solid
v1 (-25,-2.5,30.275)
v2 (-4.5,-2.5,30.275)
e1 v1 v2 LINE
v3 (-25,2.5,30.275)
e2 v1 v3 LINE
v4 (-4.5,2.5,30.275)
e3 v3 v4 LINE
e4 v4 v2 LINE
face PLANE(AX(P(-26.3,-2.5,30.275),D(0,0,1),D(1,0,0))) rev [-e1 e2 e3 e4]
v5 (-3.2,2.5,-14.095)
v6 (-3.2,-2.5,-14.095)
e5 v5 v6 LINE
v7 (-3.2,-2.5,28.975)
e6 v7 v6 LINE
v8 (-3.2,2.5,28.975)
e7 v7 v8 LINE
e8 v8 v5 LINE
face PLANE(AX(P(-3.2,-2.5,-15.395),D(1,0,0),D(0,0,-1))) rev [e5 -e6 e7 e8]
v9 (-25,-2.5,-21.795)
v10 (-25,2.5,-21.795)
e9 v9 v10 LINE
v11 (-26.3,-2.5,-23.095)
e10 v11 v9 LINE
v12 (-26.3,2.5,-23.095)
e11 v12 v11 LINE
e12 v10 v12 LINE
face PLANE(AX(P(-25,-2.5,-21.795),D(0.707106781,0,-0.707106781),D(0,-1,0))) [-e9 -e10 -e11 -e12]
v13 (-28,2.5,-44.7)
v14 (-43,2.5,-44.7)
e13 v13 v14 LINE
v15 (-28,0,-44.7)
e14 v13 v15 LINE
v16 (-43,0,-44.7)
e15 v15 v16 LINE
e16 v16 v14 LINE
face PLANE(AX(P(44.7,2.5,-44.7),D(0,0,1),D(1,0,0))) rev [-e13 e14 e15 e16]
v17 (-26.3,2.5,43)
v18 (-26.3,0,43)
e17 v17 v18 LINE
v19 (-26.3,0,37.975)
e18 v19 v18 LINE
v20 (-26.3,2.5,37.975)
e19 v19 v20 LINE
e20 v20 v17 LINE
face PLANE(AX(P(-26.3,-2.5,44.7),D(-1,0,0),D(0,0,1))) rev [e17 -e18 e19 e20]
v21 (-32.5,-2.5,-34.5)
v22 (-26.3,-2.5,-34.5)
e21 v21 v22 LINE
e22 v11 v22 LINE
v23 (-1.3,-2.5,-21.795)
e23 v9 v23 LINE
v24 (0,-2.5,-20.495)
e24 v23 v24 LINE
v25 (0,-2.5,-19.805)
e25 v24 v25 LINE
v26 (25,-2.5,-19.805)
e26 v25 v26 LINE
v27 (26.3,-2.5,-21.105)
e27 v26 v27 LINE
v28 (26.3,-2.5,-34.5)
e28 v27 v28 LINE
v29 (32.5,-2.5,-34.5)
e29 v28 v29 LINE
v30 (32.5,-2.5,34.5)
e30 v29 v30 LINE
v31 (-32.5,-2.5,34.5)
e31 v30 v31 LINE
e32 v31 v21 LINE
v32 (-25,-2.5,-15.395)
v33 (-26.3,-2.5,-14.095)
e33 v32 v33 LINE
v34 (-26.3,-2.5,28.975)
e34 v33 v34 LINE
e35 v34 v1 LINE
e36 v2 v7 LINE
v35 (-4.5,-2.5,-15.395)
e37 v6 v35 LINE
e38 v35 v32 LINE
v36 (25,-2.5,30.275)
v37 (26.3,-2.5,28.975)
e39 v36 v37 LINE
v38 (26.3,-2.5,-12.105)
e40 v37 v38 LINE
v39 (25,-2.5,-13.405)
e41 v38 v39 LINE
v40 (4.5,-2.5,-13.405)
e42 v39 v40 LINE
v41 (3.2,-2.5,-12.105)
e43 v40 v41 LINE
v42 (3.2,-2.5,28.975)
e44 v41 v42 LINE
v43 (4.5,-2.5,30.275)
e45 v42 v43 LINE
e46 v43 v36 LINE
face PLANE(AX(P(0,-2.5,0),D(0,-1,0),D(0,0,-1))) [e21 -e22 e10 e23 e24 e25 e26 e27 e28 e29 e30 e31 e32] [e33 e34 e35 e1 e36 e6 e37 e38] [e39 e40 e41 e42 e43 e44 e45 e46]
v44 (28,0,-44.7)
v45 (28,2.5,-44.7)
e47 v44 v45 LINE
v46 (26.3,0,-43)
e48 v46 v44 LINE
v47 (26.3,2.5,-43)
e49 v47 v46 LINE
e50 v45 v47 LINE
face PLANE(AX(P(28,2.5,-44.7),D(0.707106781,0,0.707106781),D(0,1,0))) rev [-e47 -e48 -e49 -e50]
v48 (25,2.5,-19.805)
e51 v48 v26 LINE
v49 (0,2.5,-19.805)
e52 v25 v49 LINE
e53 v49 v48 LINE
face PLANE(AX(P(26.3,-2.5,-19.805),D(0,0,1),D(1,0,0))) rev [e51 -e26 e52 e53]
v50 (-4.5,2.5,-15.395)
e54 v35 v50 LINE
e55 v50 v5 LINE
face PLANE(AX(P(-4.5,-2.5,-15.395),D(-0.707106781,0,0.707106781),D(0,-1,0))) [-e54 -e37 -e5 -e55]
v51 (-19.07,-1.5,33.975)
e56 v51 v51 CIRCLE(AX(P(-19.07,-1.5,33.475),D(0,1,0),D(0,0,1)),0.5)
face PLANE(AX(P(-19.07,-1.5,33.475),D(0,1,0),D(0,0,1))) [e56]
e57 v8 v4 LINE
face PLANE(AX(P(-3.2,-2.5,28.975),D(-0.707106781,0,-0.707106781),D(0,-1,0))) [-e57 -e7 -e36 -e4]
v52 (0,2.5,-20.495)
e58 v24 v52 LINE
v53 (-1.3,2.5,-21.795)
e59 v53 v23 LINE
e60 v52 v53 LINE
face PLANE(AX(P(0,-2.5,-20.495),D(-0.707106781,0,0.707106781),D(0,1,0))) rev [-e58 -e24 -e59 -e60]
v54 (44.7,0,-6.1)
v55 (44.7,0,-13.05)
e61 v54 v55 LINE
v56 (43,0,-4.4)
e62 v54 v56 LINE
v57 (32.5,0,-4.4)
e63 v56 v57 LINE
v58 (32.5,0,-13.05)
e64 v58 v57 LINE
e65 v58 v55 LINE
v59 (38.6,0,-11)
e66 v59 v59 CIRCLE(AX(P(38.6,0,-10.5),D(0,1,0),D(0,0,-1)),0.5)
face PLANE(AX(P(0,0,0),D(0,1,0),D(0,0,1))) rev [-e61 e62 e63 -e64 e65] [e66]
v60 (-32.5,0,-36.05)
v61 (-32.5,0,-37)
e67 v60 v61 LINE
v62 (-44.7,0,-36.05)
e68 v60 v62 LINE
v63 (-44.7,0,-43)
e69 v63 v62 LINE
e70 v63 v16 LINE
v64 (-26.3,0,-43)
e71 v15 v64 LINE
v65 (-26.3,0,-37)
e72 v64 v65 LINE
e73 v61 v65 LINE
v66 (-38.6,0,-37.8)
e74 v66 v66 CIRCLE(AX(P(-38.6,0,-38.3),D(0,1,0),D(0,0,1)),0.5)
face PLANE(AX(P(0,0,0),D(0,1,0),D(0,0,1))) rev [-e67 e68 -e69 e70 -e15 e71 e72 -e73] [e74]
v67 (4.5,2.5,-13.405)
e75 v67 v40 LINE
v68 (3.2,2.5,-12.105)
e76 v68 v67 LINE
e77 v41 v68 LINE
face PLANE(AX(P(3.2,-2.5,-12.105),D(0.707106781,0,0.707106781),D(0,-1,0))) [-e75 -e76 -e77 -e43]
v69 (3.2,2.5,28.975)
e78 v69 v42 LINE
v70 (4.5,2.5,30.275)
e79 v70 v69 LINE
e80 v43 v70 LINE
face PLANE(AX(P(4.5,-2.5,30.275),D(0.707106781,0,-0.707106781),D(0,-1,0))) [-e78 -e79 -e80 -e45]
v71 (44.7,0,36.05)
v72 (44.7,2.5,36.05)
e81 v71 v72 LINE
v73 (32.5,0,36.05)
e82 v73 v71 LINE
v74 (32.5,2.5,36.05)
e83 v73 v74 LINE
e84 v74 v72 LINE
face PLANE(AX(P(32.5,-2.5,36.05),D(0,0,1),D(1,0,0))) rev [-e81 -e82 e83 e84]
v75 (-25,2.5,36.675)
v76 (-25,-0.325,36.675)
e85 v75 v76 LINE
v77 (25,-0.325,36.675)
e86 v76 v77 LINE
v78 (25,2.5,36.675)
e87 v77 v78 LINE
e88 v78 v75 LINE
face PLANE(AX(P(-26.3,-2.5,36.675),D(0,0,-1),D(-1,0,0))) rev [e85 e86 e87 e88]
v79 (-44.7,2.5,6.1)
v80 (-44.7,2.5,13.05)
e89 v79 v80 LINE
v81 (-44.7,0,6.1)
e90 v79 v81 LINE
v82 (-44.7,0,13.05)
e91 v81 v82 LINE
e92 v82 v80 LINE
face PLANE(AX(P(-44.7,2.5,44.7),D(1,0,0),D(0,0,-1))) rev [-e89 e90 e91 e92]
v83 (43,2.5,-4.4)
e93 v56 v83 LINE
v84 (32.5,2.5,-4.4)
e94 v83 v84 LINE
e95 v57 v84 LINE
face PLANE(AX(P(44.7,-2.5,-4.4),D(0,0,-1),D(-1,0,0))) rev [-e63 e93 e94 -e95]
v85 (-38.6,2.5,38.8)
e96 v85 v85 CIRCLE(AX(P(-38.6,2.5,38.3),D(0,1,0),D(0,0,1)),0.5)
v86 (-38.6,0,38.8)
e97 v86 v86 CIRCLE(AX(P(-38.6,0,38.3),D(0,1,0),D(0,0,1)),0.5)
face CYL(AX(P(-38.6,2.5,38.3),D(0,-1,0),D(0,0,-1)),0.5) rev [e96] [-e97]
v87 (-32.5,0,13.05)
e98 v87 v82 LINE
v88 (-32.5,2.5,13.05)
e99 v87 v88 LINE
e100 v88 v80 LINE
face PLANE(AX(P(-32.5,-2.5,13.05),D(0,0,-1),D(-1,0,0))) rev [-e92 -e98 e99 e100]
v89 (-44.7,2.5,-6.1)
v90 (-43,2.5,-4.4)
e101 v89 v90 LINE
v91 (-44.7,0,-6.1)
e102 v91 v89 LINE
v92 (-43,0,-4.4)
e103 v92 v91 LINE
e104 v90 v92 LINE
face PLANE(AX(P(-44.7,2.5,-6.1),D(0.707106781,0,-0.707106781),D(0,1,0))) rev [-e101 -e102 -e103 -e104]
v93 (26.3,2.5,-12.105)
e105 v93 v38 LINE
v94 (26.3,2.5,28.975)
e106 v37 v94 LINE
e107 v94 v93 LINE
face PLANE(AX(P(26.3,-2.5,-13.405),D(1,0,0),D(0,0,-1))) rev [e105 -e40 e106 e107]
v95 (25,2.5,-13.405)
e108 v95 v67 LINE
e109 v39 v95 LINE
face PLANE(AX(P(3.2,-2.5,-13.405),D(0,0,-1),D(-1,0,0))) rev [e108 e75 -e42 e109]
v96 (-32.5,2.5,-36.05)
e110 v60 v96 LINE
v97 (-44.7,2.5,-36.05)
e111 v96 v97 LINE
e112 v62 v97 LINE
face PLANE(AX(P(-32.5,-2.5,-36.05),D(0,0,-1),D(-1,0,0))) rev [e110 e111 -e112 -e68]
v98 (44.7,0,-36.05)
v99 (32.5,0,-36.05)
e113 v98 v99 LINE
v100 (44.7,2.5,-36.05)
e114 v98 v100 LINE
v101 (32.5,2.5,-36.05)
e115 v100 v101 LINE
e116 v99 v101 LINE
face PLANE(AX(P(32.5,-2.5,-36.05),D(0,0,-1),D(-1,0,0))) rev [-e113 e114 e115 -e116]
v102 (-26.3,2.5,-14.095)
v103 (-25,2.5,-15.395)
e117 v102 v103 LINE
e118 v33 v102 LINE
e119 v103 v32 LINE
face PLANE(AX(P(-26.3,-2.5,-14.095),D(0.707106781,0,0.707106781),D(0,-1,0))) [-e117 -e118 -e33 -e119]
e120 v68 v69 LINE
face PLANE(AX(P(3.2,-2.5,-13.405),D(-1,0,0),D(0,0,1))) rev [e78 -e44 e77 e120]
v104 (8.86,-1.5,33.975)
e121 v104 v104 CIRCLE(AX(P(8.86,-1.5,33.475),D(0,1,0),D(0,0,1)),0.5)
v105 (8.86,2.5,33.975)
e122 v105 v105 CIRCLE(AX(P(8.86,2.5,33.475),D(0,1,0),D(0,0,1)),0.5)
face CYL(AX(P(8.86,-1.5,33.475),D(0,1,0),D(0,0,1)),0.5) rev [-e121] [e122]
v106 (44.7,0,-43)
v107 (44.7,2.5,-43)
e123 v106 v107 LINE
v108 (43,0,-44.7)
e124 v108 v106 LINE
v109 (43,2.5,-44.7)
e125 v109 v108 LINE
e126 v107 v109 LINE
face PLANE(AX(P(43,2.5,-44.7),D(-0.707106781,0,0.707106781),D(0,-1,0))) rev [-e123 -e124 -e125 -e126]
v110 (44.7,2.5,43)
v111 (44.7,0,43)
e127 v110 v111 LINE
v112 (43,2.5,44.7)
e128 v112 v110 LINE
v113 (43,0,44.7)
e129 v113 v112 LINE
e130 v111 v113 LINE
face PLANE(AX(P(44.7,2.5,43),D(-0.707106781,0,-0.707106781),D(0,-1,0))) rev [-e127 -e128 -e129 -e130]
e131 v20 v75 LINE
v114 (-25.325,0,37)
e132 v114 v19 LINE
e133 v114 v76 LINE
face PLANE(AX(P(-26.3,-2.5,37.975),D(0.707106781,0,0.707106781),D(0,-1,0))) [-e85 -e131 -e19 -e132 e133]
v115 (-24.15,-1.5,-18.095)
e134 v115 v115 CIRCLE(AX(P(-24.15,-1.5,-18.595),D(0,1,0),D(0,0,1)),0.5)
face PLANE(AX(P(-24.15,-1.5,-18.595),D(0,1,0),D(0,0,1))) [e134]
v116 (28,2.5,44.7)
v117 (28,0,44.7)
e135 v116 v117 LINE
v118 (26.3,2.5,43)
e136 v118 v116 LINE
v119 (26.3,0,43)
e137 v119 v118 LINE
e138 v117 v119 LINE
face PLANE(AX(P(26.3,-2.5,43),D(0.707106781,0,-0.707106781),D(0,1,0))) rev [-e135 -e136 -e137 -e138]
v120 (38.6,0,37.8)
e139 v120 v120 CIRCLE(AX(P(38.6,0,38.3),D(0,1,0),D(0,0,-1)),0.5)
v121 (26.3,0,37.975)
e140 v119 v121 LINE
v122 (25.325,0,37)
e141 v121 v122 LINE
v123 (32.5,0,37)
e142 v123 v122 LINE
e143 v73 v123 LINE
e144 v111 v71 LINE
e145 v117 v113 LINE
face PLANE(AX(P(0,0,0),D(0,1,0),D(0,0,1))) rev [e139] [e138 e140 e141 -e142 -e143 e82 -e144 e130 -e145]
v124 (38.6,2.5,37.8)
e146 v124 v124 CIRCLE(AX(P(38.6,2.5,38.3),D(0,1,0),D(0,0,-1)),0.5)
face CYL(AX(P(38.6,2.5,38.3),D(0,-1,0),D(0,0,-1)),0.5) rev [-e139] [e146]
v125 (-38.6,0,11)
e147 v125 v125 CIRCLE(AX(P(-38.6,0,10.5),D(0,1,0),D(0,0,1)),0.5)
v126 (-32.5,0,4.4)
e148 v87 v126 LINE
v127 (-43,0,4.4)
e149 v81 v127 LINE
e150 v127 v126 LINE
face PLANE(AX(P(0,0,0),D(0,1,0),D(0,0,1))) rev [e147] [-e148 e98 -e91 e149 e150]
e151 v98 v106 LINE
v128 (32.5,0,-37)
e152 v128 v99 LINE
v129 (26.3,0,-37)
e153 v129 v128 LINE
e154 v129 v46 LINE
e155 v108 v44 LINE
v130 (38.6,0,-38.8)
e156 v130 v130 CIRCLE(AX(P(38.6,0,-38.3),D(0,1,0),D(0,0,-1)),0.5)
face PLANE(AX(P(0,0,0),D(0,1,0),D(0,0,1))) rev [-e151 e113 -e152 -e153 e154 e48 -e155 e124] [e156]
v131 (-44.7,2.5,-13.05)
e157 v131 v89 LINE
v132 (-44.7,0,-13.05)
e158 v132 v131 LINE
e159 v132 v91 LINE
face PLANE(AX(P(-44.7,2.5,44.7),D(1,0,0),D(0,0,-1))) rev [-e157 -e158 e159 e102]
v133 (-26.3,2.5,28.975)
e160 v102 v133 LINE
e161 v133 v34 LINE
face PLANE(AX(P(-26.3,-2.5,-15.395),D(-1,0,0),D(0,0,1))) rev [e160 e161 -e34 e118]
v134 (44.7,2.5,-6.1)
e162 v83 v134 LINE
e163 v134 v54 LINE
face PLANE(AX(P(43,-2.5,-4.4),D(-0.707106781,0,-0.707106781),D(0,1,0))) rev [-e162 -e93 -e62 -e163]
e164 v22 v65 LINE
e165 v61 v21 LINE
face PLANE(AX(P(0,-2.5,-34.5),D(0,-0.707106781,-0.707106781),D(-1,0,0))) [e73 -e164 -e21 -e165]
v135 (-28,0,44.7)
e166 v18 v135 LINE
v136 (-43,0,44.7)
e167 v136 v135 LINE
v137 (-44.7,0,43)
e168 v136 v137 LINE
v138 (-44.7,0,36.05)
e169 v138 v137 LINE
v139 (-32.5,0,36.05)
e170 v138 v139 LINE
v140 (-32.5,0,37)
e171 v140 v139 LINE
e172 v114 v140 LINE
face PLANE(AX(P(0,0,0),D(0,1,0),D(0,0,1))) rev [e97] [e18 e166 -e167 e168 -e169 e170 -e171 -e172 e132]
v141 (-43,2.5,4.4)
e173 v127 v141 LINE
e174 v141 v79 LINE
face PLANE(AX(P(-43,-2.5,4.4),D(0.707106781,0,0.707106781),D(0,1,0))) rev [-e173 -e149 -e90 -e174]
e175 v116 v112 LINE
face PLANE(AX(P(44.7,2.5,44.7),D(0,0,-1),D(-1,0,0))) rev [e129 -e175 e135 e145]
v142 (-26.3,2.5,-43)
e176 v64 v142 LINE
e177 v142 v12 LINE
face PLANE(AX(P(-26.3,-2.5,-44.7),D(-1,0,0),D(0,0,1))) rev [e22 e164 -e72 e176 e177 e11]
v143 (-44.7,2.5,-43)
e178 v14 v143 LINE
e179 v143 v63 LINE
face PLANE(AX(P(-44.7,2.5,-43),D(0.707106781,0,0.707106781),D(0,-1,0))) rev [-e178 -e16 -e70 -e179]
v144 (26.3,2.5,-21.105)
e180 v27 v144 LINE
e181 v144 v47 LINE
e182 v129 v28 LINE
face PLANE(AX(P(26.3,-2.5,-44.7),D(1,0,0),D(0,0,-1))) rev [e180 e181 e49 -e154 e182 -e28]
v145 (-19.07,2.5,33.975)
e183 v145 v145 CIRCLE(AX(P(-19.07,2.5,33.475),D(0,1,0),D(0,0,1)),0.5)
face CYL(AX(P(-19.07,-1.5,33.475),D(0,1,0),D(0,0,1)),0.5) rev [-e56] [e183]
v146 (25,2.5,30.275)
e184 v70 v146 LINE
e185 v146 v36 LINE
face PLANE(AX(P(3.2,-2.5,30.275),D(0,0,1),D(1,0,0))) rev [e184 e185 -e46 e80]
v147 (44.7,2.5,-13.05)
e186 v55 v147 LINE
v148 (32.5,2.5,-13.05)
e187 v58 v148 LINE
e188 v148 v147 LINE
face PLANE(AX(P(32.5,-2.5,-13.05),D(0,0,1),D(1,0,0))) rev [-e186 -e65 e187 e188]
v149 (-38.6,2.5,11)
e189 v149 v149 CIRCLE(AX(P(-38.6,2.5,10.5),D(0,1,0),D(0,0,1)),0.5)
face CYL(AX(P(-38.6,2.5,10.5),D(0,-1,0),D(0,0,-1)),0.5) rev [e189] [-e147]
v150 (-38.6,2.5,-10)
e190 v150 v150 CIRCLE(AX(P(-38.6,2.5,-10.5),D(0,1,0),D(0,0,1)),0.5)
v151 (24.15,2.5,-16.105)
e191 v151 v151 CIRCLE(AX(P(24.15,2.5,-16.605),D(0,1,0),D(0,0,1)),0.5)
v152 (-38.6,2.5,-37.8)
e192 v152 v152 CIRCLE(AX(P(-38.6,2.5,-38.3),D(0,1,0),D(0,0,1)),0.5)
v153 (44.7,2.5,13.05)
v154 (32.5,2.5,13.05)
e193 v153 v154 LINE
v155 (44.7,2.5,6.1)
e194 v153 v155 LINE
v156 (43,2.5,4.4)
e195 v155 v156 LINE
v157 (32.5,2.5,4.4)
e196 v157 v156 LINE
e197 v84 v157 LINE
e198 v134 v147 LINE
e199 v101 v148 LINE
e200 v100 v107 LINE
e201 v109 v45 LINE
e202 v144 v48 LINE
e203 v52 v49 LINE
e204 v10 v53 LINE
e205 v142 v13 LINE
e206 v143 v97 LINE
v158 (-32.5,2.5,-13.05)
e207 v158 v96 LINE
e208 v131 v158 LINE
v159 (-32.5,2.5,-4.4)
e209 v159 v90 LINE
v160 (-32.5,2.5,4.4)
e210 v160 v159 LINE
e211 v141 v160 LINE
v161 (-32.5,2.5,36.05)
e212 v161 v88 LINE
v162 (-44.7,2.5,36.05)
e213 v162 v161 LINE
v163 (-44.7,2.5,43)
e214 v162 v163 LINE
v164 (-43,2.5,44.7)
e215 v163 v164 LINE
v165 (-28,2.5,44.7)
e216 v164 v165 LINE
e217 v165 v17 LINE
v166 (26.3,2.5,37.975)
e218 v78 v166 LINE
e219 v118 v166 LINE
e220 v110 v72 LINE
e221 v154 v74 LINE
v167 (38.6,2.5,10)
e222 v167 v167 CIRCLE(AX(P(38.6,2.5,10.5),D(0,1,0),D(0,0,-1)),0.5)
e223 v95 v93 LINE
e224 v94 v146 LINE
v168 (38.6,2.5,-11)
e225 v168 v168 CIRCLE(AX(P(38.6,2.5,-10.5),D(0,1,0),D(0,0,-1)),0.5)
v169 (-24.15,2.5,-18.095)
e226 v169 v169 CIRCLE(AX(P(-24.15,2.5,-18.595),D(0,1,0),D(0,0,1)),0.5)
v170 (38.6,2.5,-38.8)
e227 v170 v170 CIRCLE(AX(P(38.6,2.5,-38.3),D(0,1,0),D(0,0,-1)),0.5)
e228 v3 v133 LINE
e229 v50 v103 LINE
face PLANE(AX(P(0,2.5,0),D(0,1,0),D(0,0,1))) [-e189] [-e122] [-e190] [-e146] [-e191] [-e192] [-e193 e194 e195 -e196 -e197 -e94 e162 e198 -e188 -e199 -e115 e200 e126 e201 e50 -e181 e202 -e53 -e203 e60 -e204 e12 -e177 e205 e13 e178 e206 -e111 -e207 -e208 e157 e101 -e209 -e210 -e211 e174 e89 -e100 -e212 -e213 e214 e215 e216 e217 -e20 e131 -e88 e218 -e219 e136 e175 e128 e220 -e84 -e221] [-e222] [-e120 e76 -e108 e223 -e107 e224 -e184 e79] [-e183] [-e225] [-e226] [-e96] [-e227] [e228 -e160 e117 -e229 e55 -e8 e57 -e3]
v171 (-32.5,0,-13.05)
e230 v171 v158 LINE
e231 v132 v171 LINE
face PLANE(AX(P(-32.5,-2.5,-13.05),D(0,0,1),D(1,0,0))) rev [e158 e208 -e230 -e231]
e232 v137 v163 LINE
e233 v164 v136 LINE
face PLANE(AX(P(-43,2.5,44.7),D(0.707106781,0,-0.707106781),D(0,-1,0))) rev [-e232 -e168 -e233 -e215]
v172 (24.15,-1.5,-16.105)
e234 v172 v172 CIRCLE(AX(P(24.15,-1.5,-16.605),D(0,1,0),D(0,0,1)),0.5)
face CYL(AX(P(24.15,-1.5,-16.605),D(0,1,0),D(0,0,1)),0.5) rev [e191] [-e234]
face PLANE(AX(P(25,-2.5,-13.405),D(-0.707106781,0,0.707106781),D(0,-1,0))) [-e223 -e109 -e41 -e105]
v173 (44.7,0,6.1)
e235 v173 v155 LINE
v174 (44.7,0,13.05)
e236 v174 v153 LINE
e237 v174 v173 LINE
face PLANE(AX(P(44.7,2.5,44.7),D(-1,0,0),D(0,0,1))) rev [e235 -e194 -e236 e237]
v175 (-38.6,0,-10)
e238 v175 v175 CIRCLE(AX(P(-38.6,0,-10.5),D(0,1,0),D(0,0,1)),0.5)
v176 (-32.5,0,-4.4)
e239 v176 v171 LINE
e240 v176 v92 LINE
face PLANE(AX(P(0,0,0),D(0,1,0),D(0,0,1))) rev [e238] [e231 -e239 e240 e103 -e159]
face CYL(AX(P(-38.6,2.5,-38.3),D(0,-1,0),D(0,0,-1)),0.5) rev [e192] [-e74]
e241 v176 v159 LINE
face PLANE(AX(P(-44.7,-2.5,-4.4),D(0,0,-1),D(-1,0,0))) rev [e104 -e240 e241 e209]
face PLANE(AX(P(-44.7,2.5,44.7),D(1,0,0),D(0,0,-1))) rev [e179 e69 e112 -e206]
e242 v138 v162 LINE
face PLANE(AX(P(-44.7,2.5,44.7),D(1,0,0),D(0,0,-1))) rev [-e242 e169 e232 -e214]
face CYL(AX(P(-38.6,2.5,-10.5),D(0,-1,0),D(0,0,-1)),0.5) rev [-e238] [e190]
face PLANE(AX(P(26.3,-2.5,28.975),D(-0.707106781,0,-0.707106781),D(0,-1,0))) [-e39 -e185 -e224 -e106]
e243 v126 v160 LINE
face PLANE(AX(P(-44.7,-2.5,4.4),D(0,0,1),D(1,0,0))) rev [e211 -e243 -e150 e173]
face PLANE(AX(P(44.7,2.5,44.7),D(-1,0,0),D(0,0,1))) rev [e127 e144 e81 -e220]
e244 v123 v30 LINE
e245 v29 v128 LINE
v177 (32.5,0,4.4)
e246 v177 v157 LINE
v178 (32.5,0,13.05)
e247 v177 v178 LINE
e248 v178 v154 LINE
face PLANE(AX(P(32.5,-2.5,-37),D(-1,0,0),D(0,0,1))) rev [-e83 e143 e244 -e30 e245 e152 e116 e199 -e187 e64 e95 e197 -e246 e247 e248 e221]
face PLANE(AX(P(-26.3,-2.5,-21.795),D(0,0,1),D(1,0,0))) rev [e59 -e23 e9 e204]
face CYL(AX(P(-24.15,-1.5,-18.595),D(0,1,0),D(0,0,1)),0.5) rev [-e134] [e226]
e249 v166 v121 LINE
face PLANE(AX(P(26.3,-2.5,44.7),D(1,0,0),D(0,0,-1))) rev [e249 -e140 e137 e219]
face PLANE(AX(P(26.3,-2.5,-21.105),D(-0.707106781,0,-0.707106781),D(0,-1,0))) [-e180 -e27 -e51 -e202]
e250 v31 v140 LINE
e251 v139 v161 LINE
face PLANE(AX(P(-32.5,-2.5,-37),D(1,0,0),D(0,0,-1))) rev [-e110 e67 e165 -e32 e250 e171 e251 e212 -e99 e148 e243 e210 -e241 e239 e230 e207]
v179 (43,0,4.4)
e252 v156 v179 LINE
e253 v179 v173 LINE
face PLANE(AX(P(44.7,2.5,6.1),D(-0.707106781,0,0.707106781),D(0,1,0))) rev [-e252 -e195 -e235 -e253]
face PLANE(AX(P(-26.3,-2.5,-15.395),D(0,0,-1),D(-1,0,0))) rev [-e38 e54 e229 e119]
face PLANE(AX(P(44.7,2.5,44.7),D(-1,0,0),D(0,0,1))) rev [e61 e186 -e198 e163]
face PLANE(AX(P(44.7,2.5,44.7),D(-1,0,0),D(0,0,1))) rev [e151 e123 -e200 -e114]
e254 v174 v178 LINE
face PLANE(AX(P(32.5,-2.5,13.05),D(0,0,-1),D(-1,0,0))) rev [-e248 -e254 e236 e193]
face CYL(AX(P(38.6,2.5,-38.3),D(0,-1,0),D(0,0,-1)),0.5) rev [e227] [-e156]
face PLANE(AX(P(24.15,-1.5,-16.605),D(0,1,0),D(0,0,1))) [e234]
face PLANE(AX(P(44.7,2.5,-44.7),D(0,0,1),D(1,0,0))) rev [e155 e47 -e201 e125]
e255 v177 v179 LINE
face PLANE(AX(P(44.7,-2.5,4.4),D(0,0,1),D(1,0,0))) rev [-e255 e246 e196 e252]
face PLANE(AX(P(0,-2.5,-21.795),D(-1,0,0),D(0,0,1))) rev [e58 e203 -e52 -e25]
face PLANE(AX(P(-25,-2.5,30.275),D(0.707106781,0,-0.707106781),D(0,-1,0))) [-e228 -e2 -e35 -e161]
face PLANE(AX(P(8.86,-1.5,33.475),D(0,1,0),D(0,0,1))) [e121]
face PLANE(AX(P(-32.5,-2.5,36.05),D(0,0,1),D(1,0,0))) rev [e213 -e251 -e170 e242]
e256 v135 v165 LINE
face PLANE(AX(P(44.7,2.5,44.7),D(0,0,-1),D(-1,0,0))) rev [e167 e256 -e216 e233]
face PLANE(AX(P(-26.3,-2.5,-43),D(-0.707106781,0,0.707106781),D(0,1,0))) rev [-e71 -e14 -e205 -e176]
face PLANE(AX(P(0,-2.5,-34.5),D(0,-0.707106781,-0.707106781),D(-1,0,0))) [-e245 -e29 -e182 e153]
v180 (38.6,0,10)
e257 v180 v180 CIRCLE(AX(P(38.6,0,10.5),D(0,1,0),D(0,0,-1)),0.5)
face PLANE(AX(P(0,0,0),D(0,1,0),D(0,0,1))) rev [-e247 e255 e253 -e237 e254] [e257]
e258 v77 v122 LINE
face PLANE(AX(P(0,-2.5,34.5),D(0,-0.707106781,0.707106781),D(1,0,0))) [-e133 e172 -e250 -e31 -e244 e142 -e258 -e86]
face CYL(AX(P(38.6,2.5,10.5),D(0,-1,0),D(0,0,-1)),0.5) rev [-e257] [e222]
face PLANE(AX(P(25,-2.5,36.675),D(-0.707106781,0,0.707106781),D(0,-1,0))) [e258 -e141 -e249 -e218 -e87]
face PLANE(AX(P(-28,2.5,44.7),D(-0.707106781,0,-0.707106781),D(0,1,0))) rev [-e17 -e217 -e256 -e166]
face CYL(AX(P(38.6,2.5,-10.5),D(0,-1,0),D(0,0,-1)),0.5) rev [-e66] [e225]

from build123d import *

# Parameters (mm, degrees)
SKETCH1_W               = 89.4
SKETCH1_H               = 89.4
SKETCH1_R               = 0.5
BOSS_EXTRUDE1_DEPTH     = 2.5
SKETCH5_W               = 65
SKETCH5_H               = 74
BOSS_EXTRUDE3_DEPTH     = 2.5
SKETCH7_R               = 0.5
CUT_EXTRUDE2_DEPTH      = 4
CUT_EXTRUDE1_DEPTH      = 64.412774738
CUT_EXTRUDE1_DEPTH_BACK = 64.412774738
SKETCH2_W               = 12.2
SKETCH2_H               = 23
SKETCH2_W_2             = 52.6
SKETCH2_H_2             = 8.025
SKETCH2_W_3             = 23.1
SKETCH2_H_3             = 45.67
SKETCH2_H_4             = 43.68
SKETCH2_H_5             = 8.8
CHAMFER2_SIZE           = 1.3
CHAMFER3_SIZE           = 1.3
CHAMFER4_SIZE           = 1.7
CHAMFER5_SIZE           = 2.5


with BuildPart() as part:
    # Sketch1 → Boss-Extrude1 (new body)
    with BuildSketch(Plane(origin=(0, 0, 0), x_dir=(1, 0, 0), z_dir=(0, 1, 0))):
        Rectangle(SKETCH1_W, SKETCH1_H)
        with Locations(Location((-38.6, 38.3, 0), (0, 0, 270))):
            Circle(SKETCH1_R, mode=Mode.SUBTRACT)
        with Locations(Location((-38.6, 10.5, 0), (0, 0, 270))):
            Circle(SKETCH1_R, mode=Mode.SUBTRACT)
        with Locations(Location((-38.6, -10.5, 0), (0, 0, 270))):
            Circle(SKETCH1_R, mode=Mode.SUBTRACT)
        with Locations(Location((-38.6, -38.3, 0), (0, 0, 270))):
            Circle(SKETCH1_R, mode=Mode.SUBTRACT)
        with Locations(Location((38.6, -38.3, 0), (0, 0, 90))):
            Circle(SKETCH1_R, mode=Mode.SUBTRACT)
        with Locations(Location((38.6, -10.5, 0), (0, 0, 90))):
            Circle(SKETCH1_R, mode=Mode.SUBTRACT)
        with Locations(Location((38.6, 10.5, 0), (0, 0, 90))):
            Circle(SKETCH1_R, mode=Mode.SUBTRACT)
        with Locations(Location((38.6, 38.3, 0), (0, 0, 90))):
            Circle(SKETCH1_R, mode=Mode.SUBTRACT)
    extrude(amount=BOSS_EXTRUDE1_DEPTH)

    # Sketch5 → Boss-Extrude3 (add)
    with BuildSketch(Plane.XZ):
        Rectangle(SKETCH5_W, SKETCH5_H)
    extrude(amount=BOSS_EXTRUDE3_DEPTH)

    # Sketch7 → Cut-Extrude2 (cut)
    with BuildSketch(Plane(origin=(0, 2.5, 0), x_dir=(1, 0, 0), z_dir=(0, 1, 0))):
        with Locations(Location((-24.15, 18.595, 0), (0, 0, 270))):
            Circle(SKETCH7_R)
        with Locations(Location((24.15, 16.605, 0), (0, 0, 270))):
            Circle(SKETCH7_R)
        with Locations(Location((-19.07, -33.475, 0), (0, 0, 270))):
            Circle(SKETCH7_R)
        with Locations(Location((8.86, -33.475, 0), (0, 0, 270))):
            Circle(SKETCH7_R)
    extrude(amount=-CUT_EXTRUDE2_DEPTH, mode=Mode.SUBTRACT)

    # Sketch2 → Cut-Extrude1 (cut, two sides: drawn at the far end of the back side and taken through both)
    with BuildSketch(Plane(origin=(0, 2.5, 0), x_dir=(1, 0, 0), z_dir=(0, 1, 0)).offset(-CUT_EXTRUDE1_DEPTH_BACK)):
        with Locations((-38.6, 24.55)):
            Rectangle(SKETCH2_W, SKETCH2_H)
        Polygon((-26.3, 44.7), (26.3, 44.7), (26.3, 24.23), (26.3, 19.805), (0, 19.805), (0, 21.795), (-26.3, 21.795), align=None)
        with Locations((0, -40.6875)):
            Rectangle(SKETCH2_W_2, SKETCH2_H_2)
        with Locations((-14.75, -7.44)):
            Rectangle(SKETCH2_W_3, SKETCH2_H_3)
        with Locations((14.75, -8.435)):
            Rectangle(SKETCH2_W_3, SKETCH2_H_4)
        with Locations((-38.6, 0)):
            Rectangle(SKETCH2_W, SKETCH2_H_5)
        with Locations((38.6, 0)):
            Rectangle(SKETCH2_W, SKETCH2_H_5)
        with Locations((38.6, 24.55)):
            Rectangle(SKETCH2_W, SKETCH2_H)
        with Locations((38.6, -24.55)):
            Rectangle(SKETCH2_W, SKETCH2_H)
        with Locations((-38.6, -24.55)):
            Rectangle(SKETCH2_W, SKETCH2_H)
    extrude(amount=CUT_EXTRUDE1_DEPTH + CUT_EXTRUDE1_DEPTH_BACK, mode=Mode.SUBTRACT)

    # Chamfer2
    chamfer2_edges = [part.edges().sort_by_distance(p)[0] for p in [
        (0, 0, -21.795),
    ]]
    chamfer(chamfer2_edges, length=CHAMFER2_SIZE)

    # Chamfer3
    chamfer3_edges = [part.edges().sort_by_distance(p)[0] for p in [
        (-26.3, 0, -21.795),
        (26.3, 0, 36.675),
        (-26.3, 0, 36.675),
        (-26.3, 0, 30.275),
        (-3.2, 0, 30.275),
        (3.2, 0, 30.275),
        (26.3, 0, 30.275),
        (-3.2, 0, -15.395),
        (3.2, 0, -13.405),
        (26.3, 0, -13.405),
        (26.3, 0, -19.805),
        (-26.3, 0, -15.395),
    ]]
    chamfer(chamfer3_edges, length=CHAMFER3_SIZE)

    # Chamfer4
    chamfer4_edges = [part.edges().sort_by_distance(p)[0] for p in [
        (26.3, 1.25, 44.7),
        (-26.3, 1.25, 44.7),
        (-44.7, 1.25, 4.4),
        (-44.7, 1.25, -4.4),
        (-26.3, 1.25, -44.7),
        (26.3, 1.25, -44.7),
        (44.7, 1.25, -4.4),
        (44.7, 1.25, 4.4),
        (-44.7, 1.25, -44.7),
        (44.7, 1.25, -44.7),
        (44.7, 1.25, 44.7),
        (-44.7, 1.25, 44.7),
    ]]
    chamfer(chamfer4_edges, length=CHAMFER4_SIZE)

    # Chamfer5
    chamfer5_edges = [part.edges().sort_by_distance(p)[0] for p in [
        (28.9125, -2.5, 37),
        (29.4, -2.5, -37),
        (-29.4, -2.5, -37),
    ]]
    chamfer(chamfer5_edges, length=CHAMFER5_SIZE - 0.0001)  # a hair under: the kernel refuses the full size


solid = part.part
